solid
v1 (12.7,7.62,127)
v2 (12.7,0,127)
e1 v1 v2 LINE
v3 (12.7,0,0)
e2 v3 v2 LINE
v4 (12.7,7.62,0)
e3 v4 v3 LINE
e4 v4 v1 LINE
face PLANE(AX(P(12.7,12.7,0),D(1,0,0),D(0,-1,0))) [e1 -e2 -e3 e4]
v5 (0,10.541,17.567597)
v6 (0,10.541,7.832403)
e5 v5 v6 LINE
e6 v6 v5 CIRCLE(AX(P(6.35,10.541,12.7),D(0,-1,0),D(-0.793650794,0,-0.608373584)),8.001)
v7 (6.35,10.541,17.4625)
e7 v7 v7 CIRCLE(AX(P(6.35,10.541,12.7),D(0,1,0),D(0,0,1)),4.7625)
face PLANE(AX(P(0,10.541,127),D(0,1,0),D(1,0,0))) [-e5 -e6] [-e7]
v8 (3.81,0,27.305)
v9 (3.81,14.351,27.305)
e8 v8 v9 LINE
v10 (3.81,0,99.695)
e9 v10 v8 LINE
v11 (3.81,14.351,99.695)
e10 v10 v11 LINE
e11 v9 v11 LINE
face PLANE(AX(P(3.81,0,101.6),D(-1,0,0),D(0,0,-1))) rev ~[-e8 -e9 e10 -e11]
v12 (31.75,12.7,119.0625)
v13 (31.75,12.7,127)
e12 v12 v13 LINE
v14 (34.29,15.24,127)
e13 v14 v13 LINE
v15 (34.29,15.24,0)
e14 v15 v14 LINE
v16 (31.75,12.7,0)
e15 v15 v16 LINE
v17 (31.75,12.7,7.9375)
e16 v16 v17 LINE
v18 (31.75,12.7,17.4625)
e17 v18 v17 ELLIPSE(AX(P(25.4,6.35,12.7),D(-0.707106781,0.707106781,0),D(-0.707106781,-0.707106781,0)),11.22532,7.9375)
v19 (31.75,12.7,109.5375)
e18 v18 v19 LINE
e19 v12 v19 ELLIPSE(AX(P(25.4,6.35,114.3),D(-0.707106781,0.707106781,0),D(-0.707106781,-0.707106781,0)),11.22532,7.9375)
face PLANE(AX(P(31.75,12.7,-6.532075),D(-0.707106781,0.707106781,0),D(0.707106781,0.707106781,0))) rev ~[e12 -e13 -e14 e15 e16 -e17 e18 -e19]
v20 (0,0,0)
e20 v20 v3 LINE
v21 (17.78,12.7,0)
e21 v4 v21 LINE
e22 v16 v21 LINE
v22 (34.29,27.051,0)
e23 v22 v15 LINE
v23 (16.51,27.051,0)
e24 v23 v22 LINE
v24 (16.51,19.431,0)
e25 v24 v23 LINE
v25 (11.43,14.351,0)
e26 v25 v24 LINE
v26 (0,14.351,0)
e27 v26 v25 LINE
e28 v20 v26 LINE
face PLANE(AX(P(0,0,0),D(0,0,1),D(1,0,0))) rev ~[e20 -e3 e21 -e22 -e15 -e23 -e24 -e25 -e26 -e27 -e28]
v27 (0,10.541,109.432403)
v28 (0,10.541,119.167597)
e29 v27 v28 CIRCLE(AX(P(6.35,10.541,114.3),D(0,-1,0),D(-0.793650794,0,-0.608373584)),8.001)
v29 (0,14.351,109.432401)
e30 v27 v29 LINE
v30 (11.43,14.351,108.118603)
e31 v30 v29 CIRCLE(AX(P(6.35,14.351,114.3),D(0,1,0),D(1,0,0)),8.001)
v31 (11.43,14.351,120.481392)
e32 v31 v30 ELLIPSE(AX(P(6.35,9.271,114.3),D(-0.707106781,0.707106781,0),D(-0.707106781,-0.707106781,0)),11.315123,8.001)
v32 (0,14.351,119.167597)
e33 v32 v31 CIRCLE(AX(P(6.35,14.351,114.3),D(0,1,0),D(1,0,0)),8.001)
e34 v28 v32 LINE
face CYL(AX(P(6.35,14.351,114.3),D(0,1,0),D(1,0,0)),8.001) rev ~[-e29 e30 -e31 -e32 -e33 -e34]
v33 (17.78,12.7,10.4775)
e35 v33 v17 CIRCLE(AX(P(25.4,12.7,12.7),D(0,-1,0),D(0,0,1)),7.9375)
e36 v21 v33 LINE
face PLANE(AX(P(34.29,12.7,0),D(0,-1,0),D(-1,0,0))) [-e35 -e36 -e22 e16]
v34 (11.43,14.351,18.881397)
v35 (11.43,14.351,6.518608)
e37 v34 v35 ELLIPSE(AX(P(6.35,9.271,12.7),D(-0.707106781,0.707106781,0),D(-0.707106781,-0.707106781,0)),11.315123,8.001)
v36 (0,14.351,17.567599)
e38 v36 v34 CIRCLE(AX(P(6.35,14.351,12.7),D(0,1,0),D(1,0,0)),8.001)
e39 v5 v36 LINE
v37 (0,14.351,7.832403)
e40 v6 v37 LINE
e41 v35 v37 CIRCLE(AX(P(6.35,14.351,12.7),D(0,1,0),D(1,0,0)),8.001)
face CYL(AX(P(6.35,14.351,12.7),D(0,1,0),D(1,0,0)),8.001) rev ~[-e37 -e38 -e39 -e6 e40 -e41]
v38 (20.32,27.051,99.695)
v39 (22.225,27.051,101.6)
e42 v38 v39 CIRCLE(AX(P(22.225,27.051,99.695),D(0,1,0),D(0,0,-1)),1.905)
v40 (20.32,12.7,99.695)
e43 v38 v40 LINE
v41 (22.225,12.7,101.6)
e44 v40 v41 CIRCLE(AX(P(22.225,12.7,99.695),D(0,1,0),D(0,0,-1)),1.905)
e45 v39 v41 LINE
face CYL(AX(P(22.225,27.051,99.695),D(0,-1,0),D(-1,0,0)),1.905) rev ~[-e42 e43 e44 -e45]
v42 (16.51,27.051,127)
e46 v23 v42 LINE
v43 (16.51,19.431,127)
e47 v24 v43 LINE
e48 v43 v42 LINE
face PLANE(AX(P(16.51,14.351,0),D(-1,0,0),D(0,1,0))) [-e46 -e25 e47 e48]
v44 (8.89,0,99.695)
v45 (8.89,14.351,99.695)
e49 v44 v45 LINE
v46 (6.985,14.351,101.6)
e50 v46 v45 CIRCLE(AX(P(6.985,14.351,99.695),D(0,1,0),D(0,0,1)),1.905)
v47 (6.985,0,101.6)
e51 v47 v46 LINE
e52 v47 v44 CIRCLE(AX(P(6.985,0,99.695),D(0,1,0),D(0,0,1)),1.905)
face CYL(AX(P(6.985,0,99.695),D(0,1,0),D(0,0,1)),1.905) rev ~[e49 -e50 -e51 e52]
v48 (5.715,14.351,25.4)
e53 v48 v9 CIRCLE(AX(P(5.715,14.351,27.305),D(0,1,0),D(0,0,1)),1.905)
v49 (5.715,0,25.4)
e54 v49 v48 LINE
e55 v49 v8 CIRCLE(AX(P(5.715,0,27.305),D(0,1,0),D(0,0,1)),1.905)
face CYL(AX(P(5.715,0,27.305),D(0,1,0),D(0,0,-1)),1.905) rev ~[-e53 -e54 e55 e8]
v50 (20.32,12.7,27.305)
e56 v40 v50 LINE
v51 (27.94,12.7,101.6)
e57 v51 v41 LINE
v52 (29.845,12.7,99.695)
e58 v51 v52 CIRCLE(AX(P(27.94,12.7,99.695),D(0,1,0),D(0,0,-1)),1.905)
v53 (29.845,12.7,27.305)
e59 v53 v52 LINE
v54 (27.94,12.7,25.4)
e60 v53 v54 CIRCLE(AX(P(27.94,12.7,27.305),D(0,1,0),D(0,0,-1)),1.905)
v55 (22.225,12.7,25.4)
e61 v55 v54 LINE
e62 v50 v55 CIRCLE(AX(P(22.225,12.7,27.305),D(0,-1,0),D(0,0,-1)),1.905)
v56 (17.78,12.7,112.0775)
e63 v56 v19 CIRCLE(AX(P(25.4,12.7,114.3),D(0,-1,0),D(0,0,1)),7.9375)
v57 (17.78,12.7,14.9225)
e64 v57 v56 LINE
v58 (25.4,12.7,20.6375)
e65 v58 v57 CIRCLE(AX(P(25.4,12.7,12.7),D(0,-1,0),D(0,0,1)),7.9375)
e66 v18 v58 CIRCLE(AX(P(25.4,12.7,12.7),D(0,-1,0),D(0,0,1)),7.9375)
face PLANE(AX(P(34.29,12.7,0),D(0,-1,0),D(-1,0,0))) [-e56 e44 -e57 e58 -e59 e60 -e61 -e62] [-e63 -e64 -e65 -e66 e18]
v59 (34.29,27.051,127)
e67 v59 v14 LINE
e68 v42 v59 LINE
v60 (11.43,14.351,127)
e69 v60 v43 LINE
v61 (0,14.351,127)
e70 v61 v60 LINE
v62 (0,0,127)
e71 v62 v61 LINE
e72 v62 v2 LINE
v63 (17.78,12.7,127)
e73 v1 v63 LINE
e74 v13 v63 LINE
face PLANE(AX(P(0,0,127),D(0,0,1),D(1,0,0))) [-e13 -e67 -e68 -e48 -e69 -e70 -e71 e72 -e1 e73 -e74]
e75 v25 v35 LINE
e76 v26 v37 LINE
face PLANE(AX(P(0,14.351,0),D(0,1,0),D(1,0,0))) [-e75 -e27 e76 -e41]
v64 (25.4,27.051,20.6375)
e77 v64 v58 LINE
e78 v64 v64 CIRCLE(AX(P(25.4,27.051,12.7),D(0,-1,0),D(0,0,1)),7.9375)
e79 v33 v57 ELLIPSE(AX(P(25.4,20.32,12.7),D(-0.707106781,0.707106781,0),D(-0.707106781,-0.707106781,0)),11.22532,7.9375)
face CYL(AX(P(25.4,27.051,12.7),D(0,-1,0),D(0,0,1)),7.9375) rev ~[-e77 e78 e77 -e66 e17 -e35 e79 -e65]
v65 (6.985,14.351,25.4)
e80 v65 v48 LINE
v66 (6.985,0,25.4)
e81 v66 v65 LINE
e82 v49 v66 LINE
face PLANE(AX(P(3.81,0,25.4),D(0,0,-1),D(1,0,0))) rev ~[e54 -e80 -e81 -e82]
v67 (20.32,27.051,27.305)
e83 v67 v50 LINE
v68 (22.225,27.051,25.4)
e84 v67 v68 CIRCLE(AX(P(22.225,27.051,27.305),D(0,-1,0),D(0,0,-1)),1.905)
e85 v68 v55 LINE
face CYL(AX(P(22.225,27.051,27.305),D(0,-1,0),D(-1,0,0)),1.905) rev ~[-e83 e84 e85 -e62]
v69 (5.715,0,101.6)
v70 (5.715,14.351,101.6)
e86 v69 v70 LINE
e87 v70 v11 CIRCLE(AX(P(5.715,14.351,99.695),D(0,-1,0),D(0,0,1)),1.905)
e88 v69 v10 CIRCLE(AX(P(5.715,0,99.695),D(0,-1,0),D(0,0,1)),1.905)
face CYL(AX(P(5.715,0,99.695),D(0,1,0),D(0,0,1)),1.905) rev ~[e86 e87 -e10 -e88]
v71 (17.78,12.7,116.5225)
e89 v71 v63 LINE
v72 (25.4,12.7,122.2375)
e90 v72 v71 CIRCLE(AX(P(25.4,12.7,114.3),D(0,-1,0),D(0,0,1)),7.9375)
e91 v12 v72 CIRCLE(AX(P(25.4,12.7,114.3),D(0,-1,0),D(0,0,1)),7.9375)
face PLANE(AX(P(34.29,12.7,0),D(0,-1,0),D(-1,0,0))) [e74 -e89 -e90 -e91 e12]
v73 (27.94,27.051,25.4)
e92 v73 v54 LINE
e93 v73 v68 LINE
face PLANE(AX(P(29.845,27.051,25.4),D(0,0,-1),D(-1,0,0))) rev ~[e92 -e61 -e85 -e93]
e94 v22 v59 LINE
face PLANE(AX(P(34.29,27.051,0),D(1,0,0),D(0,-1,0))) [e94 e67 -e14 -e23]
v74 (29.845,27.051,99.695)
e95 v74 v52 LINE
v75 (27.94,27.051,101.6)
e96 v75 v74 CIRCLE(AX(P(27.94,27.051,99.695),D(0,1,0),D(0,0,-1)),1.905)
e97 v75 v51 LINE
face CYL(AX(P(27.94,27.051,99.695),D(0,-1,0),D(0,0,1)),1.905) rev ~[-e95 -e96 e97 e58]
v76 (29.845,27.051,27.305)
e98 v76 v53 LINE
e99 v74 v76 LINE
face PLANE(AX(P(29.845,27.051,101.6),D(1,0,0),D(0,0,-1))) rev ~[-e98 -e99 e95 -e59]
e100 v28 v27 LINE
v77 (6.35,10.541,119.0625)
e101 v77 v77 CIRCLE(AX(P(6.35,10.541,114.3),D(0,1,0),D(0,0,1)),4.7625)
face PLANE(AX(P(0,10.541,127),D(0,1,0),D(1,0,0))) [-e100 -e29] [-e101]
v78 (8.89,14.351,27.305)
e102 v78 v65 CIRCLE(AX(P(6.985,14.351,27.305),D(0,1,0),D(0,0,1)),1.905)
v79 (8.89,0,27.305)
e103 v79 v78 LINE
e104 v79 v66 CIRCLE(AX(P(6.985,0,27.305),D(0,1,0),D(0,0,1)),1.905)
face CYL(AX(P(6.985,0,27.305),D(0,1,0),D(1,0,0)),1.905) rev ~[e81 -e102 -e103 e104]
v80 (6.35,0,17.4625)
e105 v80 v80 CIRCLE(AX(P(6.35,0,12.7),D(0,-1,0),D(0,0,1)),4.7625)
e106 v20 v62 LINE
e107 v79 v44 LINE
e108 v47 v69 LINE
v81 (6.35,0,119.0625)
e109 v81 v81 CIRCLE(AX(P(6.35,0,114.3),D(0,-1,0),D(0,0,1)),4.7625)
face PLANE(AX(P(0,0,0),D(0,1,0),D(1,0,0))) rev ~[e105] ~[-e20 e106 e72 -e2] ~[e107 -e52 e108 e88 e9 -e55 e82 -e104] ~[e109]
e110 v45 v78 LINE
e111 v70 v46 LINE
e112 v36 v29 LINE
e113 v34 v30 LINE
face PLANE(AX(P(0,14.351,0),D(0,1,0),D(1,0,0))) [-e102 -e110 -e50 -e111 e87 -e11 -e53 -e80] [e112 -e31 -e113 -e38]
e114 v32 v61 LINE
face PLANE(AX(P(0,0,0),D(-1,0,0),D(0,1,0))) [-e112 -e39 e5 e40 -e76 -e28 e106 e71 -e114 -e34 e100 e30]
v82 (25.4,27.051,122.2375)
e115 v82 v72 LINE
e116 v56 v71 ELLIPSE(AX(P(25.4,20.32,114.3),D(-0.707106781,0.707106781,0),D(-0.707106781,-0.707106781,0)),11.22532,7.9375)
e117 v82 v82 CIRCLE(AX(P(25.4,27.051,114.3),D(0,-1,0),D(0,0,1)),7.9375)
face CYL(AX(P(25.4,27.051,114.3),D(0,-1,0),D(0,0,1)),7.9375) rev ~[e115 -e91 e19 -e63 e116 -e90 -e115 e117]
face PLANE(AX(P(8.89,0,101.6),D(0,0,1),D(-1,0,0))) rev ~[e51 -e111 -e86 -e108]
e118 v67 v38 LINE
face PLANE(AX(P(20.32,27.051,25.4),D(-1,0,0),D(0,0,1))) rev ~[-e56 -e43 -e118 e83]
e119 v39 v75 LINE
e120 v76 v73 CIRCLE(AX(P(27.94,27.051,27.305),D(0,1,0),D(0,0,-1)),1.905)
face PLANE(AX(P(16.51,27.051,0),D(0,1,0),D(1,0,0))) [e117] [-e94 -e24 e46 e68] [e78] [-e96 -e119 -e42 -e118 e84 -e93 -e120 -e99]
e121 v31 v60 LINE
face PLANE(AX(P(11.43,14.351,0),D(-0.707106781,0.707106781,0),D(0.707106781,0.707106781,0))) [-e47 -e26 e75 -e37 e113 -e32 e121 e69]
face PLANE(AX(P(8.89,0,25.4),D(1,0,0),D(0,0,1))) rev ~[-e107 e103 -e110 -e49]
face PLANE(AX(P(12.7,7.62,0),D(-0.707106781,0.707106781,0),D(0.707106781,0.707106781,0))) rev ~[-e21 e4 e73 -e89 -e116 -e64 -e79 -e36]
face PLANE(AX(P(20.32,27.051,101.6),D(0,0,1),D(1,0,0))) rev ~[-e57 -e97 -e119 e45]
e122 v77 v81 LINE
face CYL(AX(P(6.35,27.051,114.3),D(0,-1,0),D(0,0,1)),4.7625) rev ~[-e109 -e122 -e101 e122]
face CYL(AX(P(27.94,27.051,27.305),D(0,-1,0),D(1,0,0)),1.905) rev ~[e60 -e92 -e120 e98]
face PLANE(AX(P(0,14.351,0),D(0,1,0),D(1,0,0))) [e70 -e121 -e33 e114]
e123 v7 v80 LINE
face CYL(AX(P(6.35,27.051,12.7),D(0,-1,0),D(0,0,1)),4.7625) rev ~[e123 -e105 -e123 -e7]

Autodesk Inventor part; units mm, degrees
ref_plane "YZ Plane" through (0, 0, 0) normal (1, 0, 0) x (0, 1, 0)
ref_plane "XZ Plane" through (0, 0, 0) normal (0, 1, 0) x (-1, 0, 0)
ref_plane "XY Plane" through (0, 0, 0) normal (0, 0, 1) x (1, 0, 0)
sketch "Sketch1" plane through (0, 0, 0) normal (0, 0, 1) x (1, 0, 0)
  line L0 (0, 0) -> (0, 14.351)
  line L1 (0, 0) -> (14.351, 0) construction
  line L2 (0, 14.351) -> (16.51, 14.351)
  line L3 (16.51, 14.351) -> (16.51, 27.051)
  line L4 (16.51, 27.051) -> (34.29, 27.051)
  line L5 (34.29, 27.051) -> (34.29, 12.7)
  line L6 (34.29, 12.7) -> (12.7, 12.7)
  line L7 (12.7, 12.7) -> (12.7, 0)
  line L8 (0, 0) -> (12.7, 0)
  dimension "d0" = 14.351
  dimension "d2" = 16.51
  dimension "d6" = 17.78
  dimension "d9" = 21.59
  dimension "d47" = 14.351
  dimension "d49" = 12.7
extrude "Extrusion1" add sketch "Sketch1" along normal blind 127
sketch "Sketch3" plane through (16.51, 27.051, 0) normal (0, 1, 0) x (1, 0, 0)
  line L0 (0, -127) -> (-16.51, -127) projected
  line L1 (-16.51, 0) -> (0, 0) projected
  line L2 (-16.51, 0) -> (-16.51, -127) projected
  point P0 (-10.16, -12.7)
  point P1 (-10.16, -114.3)
  dimension "d25" = 12.7
  dimension "d26" = 12.7
  dimension "d27" = 6.35
  dimension "d28" = 6.35
hole "Hole2" at (6.35, 27.051, 12.7) at (6.35, 27.051, 114.3) direction (0, -1, 0) diameter 9.525 end through all
sketch "Sketch4" plane through (16.51, 27.051, 0) normal (0, 1, 0) x (1, 0, 0)
  line L0 (17.78, 0) -> (17.78, -127) projected
  line L1 (17.78, -127) -> (0, -127) projected
  line L2 (0, 0) -> (17.78, 0) projected
  line L3 (0, 0) -> (0, -127) projected
  point P0 (-16.51, 0)
  point P1 (8.89, -12.7)
  point P2 (8.89, -114.3)
  dimension "d36" = 8.89
  dimension "d37" = 12.7
  dimension "d38" = 12.7
  dimension "d48" = 17.78
hole "Hole3" at (25.4, 27.051, 12.7) at (25.4, 27.051, 114.3) direction (0, -1, 0) diameter 15.875 end through all
sketch "Sketch5" plane through (16.51, 27.051, 0) normal (0, 1, 0) x (1, 0, 0)
  line L0 (3.81, -101.6) -> (13.335, -101.6)
  line L1 (13.335, -101.6) -> (13.335, -25.4)
  line L2 (13.335, -25.4) -> (3.81, -25.4)
  line L3 (3.81, -25.4) -> (3.81, -101.6)
  line L4 (17.78, -127) -> (0, -127) projected
  line L5 (17.78, 0) -> (17.78, -127) projected
  line L6 (0, 0) -> (17.78, 0) projected
  point P0 (-16.51, 0)
  dimension "d50" = 25.4
  dimension "d51" = 4.445
  dimension "d52" = 25.4
  dimension "d53" = 9.525
extrude "Extrusion2" cut sketch "Sketch5" against normal blind 25.4
sketch "Sketch6" plane through (0, 0, 0) normal (0, -1, 0) x (1, 0, 0)
  line L0 (3.81, 25.4) -> (8.89, 25.4)
  line L1 (8.89, 25.4) -> (8.89, 101.6)
  line L2 (8.89, 101.6) -> (3.81, 101.6)
  line L3 (3.81, 101.6) -> (3.81, 25.4)
  line L4 (20.32, 101.6) -> (29.845, 101.6) projected
  line L5 (29.845, 25.4) -> (20.32, 25.4) projected
  line L6 (0, 0) -> (0, 127) projected
  line L7 (12.7, 0) -> (12.7, 127) projected
  dimension "d57" = 3.81
  dimension "d58" = 3.81
extrude "Extrusion3" cut sketch "Sketch6" against normal blind 25.4
fillet "Fillet1" radius 1.905 8 edges at (20.32, 19.8755, 25.4) (29.845, 19.8755, 25.4) (20.32, 19.8755, 101.6) (29.845, 19.8755, 101.6) (3.81, 7.1755, 101.6) (8.89, 7.1755, 101.6) (8.89, 7.1755, 25.4) (3.81, 7.1755, 25.4)
chamfer "Chamfer1" distance 5.08 angle 45 2 edges at (16.51, 14.351, 63.5) (12.7, 12.7, 63.5)
sketch "Sketch7" plane through (0, 14.351, 127) normal (0, 1, 0) x (1, 0, 0)
  circle A0 centre (6.35, 114.3) radius 4.7625 projected
  circle A1 centre (6.35, 114.3) radius 8.001
  circle A2 centre (6.35, 12.7) radius 4.7625 projected
  circle A3 centre (6.35, 12.7) radius 8.001
  point P0 (0, 127)
  dimension "d65" = 16.002
  dimension "d66" = 16.002
extrude "Extrusion4" cut sketch "Sketch7" against normal blind 3.81
sketch "Sketch8" plane through (0, 14.351, 0) normal (0, 1, 0) x (1, 0, 0)
  arc A0 (0, -17.5676) -> (11.43, -18.8814) centre (6.35, -12.7) ccw projected
  circle A1 centre (6.35, -12.7) radius 8.001
  arc A2 (11.43, -108.1186) -> (0, -109.4324) centre (6.35, -114.3) ccw projected
  circle A3 centre (6.35, -114.3) radius 8.001
  point P0 (0, 0)
extrude "Extrusion5" cut sketch "Sketch8" along normal blind 3.81
chamfer "Chamfer2" distance 2.54 angle 45 1 edges at (34.29, 12.7, 63.5)
equation "\"d0\" = d47"
equation "\"d26\" = d25"
equation "\"d28\" = d27"
equation "\"d36\" = 0.5 * d48"
equation "\"d38\" = d37"
equation "\"d58\" = d57"
properties part number "Block_3-8" material "Aluminum 6061"
